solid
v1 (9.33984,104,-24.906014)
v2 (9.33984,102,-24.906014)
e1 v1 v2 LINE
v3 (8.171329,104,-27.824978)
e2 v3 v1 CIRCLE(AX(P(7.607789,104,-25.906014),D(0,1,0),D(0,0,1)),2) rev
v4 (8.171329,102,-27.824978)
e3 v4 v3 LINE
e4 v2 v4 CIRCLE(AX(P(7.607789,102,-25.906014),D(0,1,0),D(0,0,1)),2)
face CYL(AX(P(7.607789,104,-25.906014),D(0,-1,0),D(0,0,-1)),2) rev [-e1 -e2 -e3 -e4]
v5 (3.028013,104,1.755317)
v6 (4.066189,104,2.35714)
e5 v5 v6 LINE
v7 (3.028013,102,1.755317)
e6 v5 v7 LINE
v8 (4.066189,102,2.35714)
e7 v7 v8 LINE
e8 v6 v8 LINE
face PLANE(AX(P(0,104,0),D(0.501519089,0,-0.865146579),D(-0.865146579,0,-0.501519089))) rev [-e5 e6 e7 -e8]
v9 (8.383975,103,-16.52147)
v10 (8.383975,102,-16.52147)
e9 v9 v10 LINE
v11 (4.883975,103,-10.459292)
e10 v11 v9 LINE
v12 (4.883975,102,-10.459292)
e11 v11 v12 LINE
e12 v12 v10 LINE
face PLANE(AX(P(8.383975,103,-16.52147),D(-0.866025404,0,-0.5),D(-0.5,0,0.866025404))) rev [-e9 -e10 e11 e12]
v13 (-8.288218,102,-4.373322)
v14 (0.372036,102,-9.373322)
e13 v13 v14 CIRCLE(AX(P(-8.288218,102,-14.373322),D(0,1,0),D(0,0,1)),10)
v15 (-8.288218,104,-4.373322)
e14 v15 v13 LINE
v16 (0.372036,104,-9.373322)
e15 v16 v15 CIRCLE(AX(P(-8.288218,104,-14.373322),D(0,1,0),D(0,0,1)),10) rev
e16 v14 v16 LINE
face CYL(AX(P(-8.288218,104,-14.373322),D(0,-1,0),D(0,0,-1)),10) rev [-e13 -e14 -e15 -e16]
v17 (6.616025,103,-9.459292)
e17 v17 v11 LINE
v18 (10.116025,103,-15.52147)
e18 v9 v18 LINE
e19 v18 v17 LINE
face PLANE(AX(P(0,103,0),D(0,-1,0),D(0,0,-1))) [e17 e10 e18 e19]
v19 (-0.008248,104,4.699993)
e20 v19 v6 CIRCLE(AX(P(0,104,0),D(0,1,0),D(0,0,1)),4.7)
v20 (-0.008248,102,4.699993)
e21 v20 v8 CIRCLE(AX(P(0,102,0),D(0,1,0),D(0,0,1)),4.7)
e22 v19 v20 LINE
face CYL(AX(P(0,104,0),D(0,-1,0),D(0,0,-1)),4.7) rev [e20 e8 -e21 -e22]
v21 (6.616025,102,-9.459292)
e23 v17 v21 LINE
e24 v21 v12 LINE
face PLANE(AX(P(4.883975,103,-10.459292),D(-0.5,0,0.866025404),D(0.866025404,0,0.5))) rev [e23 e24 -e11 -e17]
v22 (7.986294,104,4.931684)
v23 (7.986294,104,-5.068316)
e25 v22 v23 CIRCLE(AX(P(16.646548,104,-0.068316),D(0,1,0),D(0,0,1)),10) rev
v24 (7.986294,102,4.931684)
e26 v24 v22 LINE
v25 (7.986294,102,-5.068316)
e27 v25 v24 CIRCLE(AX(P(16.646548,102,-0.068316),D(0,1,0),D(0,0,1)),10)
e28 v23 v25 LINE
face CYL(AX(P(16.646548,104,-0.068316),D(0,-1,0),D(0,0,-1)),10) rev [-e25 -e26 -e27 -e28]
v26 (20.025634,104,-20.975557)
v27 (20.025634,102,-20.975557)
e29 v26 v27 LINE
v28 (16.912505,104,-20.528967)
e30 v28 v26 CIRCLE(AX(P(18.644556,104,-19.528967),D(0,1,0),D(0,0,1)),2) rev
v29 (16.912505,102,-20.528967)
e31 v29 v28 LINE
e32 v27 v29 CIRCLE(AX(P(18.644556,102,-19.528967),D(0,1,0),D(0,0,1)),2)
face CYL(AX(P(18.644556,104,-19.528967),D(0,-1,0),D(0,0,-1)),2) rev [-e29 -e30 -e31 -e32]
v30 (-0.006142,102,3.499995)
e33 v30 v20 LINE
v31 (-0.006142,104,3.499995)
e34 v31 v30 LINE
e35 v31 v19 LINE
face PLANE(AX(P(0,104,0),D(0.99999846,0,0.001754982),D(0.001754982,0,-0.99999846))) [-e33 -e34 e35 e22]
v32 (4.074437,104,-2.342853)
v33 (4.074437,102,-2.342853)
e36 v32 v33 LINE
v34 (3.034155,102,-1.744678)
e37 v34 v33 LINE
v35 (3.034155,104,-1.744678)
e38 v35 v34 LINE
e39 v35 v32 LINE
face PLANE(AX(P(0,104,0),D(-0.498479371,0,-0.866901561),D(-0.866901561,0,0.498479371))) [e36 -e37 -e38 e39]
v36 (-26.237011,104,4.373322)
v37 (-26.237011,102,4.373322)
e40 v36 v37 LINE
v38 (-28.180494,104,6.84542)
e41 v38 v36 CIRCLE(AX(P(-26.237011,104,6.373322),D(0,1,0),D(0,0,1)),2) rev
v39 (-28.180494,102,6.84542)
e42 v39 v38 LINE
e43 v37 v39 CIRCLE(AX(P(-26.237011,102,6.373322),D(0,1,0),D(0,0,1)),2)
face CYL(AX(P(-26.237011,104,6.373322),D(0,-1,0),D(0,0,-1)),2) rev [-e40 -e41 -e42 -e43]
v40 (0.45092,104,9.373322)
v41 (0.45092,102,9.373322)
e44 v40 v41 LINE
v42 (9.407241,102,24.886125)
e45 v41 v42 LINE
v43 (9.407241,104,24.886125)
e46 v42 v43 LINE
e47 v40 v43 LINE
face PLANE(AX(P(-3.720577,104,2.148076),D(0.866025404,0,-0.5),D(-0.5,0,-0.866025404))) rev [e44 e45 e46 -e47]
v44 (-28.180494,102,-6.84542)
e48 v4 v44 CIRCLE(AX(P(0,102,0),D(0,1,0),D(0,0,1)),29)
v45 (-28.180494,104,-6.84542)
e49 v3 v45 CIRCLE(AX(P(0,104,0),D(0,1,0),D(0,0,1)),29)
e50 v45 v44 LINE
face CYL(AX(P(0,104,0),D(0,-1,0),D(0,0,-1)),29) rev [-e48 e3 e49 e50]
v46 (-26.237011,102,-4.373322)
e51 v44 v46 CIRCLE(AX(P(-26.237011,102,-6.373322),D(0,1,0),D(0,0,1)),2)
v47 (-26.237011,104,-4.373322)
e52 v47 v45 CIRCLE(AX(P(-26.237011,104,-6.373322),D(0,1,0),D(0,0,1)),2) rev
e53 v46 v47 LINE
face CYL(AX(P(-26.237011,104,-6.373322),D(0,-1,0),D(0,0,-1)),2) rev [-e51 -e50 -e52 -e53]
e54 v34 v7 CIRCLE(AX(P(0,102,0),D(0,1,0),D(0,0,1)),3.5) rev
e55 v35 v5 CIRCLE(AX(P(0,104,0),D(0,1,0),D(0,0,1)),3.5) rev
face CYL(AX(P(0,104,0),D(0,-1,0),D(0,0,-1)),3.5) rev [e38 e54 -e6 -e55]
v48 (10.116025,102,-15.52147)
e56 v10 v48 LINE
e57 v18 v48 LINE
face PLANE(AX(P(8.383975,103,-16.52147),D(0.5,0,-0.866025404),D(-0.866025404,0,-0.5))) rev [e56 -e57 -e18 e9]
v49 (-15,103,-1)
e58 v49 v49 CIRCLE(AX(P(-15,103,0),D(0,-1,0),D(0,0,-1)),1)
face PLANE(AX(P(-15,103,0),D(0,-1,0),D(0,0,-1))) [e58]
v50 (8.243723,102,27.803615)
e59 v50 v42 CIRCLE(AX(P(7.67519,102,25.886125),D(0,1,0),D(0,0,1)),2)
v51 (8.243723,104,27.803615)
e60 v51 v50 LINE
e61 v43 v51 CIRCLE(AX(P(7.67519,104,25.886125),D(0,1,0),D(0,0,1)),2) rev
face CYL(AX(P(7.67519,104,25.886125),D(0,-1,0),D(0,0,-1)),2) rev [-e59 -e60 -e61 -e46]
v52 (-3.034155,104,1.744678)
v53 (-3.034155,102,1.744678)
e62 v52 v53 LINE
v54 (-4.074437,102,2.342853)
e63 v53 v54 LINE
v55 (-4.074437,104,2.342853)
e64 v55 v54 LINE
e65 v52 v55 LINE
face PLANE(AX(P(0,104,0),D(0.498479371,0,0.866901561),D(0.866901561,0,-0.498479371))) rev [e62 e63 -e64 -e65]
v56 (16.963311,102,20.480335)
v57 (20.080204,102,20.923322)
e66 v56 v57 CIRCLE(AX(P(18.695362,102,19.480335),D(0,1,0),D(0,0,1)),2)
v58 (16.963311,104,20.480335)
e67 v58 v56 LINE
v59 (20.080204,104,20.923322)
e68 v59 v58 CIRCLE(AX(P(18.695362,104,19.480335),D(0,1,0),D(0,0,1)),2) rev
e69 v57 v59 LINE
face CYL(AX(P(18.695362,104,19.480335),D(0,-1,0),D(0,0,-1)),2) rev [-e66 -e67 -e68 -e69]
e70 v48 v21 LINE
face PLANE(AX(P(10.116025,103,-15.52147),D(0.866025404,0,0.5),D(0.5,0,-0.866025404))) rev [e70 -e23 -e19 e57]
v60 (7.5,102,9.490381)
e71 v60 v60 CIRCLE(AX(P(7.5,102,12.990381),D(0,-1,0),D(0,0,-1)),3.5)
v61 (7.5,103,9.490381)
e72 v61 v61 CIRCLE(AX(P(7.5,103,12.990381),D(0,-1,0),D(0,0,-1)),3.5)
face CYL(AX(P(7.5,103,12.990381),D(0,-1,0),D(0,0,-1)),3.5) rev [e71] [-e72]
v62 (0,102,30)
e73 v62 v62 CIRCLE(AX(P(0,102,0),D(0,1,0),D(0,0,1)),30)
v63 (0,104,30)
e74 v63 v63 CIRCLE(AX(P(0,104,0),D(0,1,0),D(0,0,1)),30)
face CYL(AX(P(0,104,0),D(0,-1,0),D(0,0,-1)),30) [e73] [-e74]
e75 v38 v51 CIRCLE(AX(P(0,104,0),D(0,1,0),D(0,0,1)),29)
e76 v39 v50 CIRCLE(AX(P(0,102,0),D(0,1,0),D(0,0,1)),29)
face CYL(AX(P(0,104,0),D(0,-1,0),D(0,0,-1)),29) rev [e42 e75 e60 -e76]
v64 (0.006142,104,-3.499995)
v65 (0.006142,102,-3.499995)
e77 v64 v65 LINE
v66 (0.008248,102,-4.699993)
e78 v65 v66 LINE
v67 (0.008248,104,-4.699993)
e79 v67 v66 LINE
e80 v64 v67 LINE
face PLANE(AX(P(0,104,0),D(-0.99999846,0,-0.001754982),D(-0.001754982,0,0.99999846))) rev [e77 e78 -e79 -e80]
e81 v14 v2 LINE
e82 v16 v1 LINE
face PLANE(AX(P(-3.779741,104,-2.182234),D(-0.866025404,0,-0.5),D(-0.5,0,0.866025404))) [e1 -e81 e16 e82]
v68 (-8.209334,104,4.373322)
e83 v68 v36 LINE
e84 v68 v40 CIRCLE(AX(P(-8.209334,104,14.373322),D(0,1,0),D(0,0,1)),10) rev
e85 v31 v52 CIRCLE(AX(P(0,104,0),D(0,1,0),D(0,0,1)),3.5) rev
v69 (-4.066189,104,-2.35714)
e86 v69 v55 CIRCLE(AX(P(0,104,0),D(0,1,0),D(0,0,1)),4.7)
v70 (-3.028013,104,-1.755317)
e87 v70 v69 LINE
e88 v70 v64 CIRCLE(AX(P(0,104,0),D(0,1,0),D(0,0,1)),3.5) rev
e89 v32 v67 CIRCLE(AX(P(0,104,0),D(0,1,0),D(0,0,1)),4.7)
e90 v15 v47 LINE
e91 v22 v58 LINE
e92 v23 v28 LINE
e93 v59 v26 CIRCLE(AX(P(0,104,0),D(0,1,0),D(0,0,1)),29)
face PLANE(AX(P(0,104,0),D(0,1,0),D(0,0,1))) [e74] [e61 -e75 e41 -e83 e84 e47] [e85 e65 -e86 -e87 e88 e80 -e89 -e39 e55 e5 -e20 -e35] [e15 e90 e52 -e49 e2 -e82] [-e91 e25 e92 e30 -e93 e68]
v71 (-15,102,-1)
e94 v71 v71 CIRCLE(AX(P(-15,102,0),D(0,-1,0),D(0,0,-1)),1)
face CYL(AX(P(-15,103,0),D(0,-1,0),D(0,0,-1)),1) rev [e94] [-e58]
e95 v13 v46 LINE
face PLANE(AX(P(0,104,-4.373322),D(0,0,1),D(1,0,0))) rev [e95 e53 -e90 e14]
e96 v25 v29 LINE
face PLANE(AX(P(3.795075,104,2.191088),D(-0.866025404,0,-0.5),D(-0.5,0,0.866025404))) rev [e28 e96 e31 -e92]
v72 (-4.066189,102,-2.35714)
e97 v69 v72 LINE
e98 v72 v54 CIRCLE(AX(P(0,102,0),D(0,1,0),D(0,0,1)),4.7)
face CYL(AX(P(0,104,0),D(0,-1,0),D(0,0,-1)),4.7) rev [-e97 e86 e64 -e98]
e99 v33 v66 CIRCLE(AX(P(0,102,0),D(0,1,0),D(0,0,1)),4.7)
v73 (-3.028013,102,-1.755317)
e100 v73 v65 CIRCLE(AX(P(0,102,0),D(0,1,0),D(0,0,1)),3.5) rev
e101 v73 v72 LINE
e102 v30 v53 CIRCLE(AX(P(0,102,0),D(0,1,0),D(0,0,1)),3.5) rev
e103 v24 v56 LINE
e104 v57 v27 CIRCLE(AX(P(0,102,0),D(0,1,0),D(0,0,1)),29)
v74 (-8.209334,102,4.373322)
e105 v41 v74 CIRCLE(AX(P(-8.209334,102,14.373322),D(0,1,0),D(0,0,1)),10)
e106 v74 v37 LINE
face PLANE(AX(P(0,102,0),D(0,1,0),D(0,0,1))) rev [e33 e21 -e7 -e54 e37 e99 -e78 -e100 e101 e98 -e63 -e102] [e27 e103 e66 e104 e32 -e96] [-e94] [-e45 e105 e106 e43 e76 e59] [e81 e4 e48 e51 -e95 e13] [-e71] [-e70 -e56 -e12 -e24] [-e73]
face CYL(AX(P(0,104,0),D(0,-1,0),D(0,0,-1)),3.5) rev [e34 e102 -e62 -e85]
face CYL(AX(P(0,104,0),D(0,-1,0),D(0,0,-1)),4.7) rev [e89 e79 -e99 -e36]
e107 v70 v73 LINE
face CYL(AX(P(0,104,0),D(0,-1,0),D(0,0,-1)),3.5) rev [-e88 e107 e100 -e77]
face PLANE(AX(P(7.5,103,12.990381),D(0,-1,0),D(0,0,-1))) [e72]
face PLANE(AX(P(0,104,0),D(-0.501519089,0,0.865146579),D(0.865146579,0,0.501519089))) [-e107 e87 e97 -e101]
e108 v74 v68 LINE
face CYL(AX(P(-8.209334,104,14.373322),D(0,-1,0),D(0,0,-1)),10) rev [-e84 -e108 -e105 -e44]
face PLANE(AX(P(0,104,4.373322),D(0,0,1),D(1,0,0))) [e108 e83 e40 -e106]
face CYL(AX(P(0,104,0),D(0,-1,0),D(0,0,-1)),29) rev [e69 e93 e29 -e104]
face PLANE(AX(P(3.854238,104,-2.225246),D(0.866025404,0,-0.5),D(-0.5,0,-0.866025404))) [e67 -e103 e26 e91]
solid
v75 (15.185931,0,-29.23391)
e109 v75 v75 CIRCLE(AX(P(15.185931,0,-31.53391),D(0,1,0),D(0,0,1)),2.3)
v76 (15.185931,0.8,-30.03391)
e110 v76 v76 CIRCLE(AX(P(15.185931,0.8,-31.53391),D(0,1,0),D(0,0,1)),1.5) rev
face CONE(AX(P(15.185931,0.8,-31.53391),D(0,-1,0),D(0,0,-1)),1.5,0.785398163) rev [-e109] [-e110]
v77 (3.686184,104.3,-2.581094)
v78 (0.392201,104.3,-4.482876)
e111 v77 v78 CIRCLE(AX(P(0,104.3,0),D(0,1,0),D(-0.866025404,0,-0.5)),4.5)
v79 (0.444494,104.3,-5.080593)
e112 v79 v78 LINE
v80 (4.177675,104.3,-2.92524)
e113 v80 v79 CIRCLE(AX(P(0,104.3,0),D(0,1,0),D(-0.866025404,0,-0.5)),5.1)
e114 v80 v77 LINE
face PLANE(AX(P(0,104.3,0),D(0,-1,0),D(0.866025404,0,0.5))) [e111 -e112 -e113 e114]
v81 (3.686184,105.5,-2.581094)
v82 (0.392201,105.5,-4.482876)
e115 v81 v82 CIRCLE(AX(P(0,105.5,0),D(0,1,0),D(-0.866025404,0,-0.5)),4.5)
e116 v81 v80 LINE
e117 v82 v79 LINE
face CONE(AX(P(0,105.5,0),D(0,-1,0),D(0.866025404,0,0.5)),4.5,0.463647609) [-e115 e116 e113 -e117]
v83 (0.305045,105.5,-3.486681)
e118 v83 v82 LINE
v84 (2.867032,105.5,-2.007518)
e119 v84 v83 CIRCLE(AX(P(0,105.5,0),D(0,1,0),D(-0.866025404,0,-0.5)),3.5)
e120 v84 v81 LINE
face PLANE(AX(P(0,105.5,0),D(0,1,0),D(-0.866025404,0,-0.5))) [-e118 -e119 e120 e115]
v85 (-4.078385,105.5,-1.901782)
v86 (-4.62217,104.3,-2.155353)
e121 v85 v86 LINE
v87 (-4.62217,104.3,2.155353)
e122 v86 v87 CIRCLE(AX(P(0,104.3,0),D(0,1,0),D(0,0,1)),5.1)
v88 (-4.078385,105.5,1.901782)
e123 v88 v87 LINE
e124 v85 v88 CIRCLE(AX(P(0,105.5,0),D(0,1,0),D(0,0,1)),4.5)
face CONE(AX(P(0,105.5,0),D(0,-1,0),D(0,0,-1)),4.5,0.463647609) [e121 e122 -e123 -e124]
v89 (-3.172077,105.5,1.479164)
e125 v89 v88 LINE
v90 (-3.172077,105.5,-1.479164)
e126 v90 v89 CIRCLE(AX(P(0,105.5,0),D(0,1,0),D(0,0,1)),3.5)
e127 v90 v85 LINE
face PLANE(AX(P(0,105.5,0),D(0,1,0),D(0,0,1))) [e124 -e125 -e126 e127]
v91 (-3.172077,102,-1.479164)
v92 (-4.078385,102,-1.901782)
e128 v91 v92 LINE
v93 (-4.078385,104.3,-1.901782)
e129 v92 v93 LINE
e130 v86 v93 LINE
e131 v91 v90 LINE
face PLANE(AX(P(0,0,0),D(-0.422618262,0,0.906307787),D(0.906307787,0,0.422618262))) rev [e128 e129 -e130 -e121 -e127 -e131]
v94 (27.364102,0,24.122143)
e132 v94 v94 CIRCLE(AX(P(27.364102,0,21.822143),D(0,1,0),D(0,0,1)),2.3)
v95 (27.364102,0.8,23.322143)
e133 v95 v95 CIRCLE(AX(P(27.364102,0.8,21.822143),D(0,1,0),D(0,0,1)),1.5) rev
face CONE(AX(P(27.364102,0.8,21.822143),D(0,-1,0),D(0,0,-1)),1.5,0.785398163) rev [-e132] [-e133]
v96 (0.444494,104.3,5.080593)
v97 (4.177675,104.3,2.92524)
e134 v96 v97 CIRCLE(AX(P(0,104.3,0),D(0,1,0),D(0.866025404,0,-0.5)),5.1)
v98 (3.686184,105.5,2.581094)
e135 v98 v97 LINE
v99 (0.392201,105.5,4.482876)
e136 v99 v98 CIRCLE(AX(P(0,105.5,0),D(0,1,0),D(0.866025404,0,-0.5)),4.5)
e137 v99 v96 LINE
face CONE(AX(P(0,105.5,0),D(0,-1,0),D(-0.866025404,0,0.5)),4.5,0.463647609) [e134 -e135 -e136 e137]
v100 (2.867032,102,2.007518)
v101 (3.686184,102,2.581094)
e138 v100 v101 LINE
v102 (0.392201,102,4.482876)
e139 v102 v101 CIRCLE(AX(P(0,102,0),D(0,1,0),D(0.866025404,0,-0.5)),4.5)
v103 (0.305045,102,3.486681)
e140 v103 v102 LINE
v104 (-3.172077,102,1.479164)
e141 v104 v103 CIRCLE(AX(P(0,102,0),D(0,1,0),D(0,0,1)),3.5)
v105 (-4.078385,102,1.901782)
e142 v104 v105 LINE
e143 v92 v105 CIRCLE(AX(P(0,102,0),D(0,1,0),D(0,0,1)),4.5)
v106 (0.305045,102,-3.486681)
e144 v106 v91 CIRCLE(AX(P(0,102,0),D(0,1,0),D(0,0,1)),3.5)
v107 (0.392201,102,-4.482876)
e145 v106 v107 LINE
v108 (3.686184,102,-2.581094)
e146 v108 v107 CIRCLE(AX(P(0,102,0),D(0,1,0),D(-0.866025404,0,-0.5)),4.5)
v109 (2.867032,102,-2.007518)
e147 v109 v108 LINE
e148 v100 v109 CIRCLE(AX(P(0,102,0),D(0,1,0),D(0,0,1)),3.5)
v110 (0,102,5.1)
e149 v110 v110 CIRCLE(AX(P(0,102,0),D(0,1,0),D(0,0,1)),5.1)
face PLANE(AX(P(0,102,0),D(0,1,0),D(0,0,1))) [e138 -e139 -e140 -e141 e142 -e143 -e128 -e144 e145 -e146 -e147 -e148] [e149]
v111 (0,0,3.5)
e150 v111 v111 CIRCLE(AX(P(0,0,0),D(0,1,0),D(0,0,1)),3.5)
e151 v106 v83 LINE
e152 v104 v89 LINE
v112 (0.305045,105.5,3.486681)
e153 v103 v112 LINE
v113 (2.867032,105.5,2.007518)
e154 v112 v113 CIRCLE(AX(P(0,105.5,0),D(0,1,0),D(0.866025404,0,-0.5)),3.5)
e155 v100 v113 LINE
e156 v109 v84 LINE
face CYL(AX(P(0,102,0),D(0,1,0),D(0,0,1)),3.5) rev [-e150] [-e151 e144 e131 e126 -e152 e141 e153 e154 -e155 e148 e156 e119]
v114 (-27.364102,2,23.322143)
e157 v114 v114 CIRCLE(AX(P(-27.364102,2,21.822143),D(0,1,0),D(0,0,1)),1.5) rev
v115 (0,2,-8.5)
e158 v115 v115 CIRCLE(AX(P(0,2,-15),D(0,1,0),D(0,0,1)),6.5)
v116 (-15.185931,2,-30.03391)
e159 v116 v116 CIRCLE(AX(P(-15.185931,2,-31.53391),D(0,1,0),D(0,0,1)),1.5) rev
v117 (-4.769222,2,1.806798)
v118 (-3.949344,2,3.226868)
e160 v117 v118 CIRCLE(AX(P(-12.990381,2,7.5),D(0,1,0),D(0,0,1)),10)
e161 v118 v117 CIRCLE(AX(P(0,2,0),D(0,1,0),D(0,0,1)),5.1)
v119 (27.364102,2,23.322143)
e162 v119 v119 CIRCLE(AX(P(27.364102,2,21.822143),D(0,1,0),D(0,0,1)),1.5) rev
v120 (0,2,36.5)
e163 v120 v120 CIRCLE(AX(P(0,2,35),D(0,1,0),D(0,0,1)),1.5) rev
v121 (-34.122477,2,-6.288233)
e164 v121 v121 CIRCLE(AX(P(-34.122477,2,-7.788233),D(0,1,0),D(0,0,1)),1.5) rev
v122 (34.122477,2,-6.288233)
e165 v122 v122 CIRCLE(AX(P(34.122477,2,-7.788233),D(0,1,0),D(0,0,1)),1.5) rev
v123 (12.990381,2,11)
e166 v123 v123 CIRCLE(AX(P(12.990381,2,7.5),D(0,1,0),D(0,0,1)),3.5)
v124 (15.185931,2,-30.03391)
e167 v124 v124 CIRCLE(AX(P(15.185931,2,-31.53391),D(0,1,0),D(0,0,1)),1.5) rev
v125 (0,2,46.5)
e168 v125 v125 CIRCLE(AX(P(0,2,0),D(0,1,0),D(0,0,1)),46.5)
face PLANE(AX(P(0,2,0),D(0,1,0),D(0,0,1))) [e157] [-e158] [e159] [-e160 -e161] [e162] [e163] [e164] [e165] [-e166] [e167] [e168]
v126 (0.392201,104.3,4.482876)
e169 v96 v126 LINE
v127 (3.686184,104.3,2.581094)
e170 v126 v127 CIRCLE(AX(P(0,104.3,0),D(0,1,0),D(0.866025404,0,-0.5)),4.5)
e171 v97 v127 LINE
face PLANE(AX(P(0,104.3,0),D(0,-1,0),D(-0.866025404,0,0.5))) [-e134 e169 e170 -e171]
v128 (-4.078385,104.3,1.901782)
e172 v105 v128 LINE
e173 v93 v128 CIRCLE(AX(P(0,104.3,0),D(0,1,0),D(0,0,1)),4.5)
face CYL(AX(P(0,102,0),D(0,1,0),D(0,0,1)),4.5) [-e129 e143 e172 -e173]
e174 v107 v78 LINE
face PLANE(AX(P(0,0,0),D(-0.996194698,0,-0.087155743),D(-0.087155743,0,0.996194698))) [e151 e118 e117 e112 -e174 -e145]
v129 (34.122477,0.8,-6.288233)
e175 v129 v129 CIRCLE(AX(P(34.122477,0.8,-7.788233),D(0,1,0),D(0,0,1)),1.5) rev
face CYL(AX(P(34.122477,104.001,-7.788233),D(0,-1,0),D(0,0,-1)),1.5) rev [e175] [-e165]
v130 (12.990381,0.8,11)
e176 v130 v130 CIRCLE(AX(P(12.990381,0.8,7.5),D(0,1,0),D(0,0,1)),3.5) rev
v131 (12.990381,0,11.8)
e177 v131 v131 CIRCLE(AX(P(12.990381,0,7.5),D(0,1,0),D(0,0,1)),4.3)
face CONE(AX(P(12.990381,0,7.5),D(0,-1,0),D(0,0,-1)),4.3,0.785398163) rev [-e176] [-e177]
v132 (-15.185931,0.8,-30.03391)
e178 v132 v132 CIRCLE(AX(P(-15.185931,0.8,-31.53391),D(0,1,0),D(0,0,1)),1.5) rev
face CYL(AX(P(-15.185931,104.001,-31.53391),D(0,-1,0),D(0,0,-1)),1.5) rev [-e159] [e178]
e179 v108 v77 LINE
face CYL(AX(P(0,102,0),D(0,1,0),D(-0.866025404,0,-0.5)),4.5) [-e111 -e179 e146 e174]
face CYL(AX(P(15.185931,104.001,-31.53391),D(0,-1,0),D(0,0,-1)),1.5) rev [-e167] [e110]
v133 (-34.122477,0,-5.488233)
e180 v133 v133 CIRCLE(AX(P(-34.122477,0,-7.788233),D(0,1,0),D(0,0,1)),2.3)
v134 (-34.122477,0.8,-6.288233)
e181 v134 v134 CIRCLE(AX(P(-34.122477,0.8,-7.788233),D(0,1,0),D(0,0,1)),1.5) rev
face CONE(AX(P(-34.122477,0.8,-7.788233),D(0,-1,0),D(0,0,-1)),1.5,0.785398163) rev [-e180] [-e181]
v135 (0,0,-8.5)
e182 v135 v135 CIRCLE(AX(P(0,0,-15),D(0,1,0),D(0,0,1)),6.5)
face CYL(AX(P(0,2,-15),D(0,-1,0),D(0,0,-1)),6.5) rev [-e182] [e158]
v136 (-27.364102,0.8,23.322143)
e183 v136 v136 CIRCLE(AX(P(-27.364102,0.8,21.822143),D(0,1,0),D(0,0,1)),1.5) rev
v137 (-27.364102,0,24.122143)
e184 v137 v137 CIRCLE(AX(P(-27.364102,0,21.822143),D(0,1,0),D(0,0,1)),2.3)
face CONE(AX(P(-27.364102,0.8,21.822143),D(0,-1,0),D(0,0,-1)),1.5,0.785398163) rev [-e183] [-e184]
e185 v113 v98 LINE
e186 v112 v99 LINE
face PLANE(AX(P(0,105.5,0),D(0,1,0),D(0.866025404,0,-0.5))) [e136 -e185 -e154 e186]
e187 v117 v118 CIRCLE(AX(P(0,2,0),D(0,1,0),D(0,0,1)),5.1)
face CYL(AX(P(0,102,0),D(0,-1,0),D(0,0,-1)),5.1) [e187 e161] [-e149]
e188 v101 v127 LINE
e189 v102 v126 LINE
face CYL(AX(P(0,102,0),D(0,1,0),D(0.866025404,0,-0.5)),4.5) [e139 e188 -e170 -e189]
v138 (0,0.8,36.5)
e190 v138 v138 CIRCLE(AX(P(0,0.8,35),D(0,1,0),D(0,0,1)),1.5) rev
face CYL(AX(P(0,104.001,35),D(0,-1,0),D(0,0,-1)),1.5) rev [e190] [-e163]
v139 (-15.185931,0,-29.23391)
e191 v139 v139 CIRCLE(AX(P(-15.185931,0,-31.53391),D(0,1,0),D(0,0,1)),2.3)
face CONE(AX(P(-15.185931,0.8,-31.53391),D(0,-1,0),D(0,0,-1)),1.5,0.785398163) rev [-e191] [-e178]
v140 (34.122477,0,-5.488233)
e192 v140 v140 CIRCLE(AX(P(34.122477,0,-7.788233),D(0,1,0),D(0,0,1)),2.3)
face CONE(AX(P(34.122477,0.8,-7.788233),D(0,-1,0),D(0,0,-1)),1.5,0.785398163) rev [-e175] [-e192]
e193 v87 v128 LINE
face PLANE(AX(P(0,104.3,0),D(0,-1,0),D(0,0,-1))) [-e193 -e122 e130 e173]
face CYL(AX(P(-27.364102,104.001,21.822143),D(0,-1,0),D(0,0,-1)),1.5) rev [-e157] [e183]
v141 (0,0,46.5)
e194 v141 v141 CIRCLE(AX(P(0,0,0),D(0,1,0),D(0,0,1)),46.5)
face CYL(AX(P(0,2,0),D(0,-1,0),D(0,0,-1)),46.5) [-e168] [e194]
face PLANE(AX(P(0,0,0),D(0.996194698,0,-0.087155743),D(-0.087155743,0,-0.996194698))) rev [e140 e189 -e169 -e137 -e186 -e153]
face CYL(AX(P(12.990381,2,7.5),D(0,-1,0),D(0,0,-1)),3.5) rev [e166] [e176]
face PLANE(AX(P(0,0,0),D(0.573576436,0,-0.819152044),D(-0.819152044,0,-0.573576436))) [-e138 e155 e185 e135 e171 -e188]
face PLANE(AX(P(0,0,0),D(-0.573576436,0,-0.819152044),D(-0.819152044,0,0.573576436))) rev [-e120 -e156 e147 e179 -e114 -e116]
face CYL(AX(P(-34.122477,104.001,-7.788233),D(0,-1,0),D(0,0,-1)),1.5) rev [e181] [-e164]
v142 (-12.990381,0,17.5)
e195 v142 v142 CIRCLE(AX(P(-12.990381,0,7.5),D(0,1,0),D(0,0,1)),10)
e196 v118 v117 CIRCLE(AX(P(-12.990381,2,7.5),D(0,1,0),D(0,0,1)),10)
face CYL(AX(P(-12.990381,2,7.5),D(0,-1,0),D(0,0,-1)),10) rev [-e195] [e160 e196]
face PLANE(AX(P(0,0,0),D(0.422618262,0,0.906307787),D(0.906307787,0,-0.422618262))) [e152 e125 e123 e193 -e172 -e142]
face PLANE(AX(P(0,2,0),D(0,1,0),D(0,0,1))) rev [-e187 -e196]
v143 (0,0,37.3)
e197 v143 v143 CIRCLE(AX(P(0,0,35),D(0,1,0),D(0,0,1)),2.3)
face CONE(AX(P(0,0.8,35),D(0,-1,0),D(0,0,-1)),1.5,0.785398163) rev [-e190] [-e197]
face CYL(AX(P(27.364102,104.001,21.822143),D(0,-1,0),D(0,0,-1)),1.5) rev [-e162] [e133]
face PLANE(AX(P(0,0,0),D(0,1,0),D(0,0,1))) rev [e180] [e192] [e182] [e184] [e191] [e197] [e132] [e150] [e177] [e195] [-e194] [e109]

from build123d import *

# Parameters (mm, degrees)
SKETCH1_R           = 46.5
SKETCH1_R_2         = 6.5
SKETCH1_R_3         = 10
SKETCH1_R_4         = 3.5
BOSS_EXTRUDE1_DEPTH = 2
SKETCH3_R           = 5.1
SKETCH3_R_2         = 3.5
BOSS_EXTRUDE2_DEPTH = 100
SKETCH4_R           = 30
SKETCH4_R_2         = 29
BOSS_EXTRUDE5_DEPTH = 2
FILLET1_R           = 10
FILLET2_R           = 2
SKETCH5_R           = 1
SKETCH5_R_2         = 3.5
CUT_EXTRUDE1_DEPTH  = 1
SKETCH6_R           = 1.5
CUT_EXTRUDE2_DEPTH  = 2
CHAMFER2_SIZE       = 0.8
REVOLVE1_ANGLE      = 50
CIRPATTERN1_COUNT   = 3


# Read off the part's stored shape, not the designer's step: Revolve1
with BuildPart() as part:
    # Sketch1 → Boss-Extrude1 (new body)
    with BuildSketch(Plane(origin=(0, 0, 0), x_dir=(1, 0, 0), z_dir=(0, 1, 0))):
        with Locations(Location((0, 0, 0), (0, 0, 270))):
            Circle(SKETCH1_R)
        with Locations(Location((0, 15, 0), (0, 0, 270))):
            Circle(SKETCH1_R_2, mode=Mode.SUBTRACT)
        with Locations(Location((-12.990381057, -7.5, 0), (0, 0, 270))):
            Circle(SKETCH1_R_3, mode=Mode.SUBTRACT)
        with Locations(Location((12.990381057, -7.5, 0), (0, 0, 270))):
            Circle(SKETCH1_R_4, mode=Mode.SUBTRACT)
        with Locations(Location((0, 0, 0), (0, 0, 270))):
            Circle(SKETCH1_R_4, mode=Mode.SUBTRACT)
    extrude(amount=BOSS_EXTRUDE1_DEPTH)

    # Sketch3 → Boss-Extrude2 (add)
    with BuildSketch(Plane(origin=(0, 2, 0), x_dir=(1, 0, 0), z_dir=(0, 1, 0))):
        with Locations(Location((0, 0, 0), (0, 0, 200.748965475))):
            Circle(SKETCH3_R)
        with Locations(Location((0, 0, 0), (0, 0, 270))):
            Circle(SKETCH3_R_2, mode=Mode.SUBTRACT)
    extrude(amount=BOSS_EXTRUDE2_DEPTH)

    # Sketch6 → Cut-Extrude2 (cut)
    with BuildSketch(Plane.XZ):
        with Locations(Location((0, 35, 0), (0, 0, 270))):
            Circle(SKETCH6_R)
        with Locations(Location((27.364101886, 21.822143065, 0), (0, 0, 270))):
            Circle(SKETCH6_R)
        with Locations(Location((34.122476926, -7.788232688, 0), (0, 0, 270))):
            Circle(SKETCH6_R)
        with Locations(Location((15.185930869, -31.533910377, 0), (0, 0, 270))):
            Circle(SKETCH6_R)
        with Locations(Location((-15.185930869, -31.533910377, 0), (0, 0, 270))):
            Circle(SKETCH6_R)
        with Locations(Location((-34.122476926, -7.788232688, 0), (0, 0, 270))):
            Circle(SKETCH6_R)
        with Locations(Location((-27.364101886, 21.822143065, 0), (0, 0, 270))):
            Circle(SKETCH6_R)
    extrude(amount=-CUT_EXTRUDE2_DEPTH, mode=Mode.SUBTRACT)

    # Chamfer2
    chamfer2_edges = [part.edges().sort_by_distance(p)[0] for p in [
        (12.990381057, 0, 4),
        (34.122476926, 0, -6.288232688),
        (27.364101886, 0, 23.322143065),
        (0, 0, 36.5),
        (-27.364101886, 0, 23.322143065),
        (-34.122476926, 0, -6.288232688),
        (-15.185930869, 0, -30.033910377),
        (15.185930869, 0, -30.033910377),
    ]]
    chamfer(chamfer2_edges, length=CHAMFER2_SIZE)


with BuildPart() as body_2:
    # Sketch4 → Boss-Extrude5 (new body)
    # profile 1 of 13: a face of its own
    with BuildSketch(Plane(origin=(0, 102, 0), x_dir=(1, 0, 0), z_dir=(0, 1, 0))):
        with Locations(Location((0, 0, 0), (0, 0, 270))):
            Circle(SKETCH4_R)
        Circle(SKETCH4_R_2, mode=Mode.SUBTRACT)
    # profile 2 of 13: a face of its own
    with BuildSketch(Plane(origin=(0, 102, 0), x_dir=(1, 0, 0), z_dir=(0, 1, 0))):
        with BuildLine():
            Line((10.555107028, 27.010918452), (-2.460515776, 4.467198464))
            ThreePointArc((-2.460515776, 4.467198464), (-1.265958194, 4.940379525), (0.008950407, 5.099992146))
            ThreePointArc((0.008950407, 5.099992146), (2.557747353, 4.412247554), (4.421197961, 2.542244793))
            ThreePointArc((4.421197961, 2.542244793), (4.918455601, 1.348626894), (5.099542425, 0.068315834))
            Line((5.099542425, 0.068315834), (18.128572143, 22.635257278))
            ThreePointArc((18.128572143, 22.635257278), (14.507755353, 25.110257558), (10.555107028, 27.010918452))
        make_face()
    # profile 3 of 13: a face of its own
    with BuildSketch(Plane(origin=(0, 102, 0), x_dir=(1, 0, 0), z_dir=(0, 1, 0))):
        with BuildLine():
            ThreePointArc((-4.412247554, 2.557747353), (-3.633233752, 3.5790519), (-2.623748403, 4.373321886))
            Line((-2.623748403, 4.373321886), (-28.668345883, 4.373321886))
            ThreePointArc((-28.668345883, 4.373321886), (-29, 0), (-28.668345883, -4.373321886))
            Line((-28.668345883, -4.373321886), (-2.623748403, -4.373321886))
            ThreePointArc((-2.623748403, -4.373321886), (-3.639509328, -3.572670129), (-4.421197961, -2.542244793))
            ThreePointArc((-4.421197961, -2.542244793), (-5.099992146, 0.008950407), (-4.412247554, 2.557747353))
        make_face()
    # profile 4 of 13: a face of its own
    with BuildSketch(Plane(origin=(0, 102, 0), x_dir=(1, 0, 0), z_dir=(0, 1, 0))):
        with BuildLine():
            Line((-2.346434517, -4.528161333), (10.619428606, -26.985695027))
            ThreePointArc((10.619428606, -26.985695027), (14.567551204, -25.075614687), (18.182472179, -22.591983212))
            Line((18.182472179, -22.591983212), (5.099542425, 0.068315834))
            ThreePointArc((5.099542425, 0.068315834), (5.099885605, 0.034158683), (5.1, 0))
            ThreePointArc((5.1, 0), (4.925061549, -1.324299338), (4.412247554, -2.557747353))
            ThreePointArc((4.412247554, -2.557747353), (2.542244793, -4.421197961), (-0.008950407, -5.099992146))
            ThreePointArc((-0.008950407, -5.099992146), (-1.211902288, -4.953916919), (-2.346434517, -4.528161333))
        make_face()
    # profile 5 of 13: a face of its own
    with BuildSketch(Plane(origin=(0, 102, 0), x_dir=(1, 0, 0), z_dir=(0, 1, 0))):
        with BuildLine():
            Line((-2.460515776, 4.467198464), (-2.514715444, 4.373321886))
            Line((-2.514715444, 4.373321886), (-2.623748403, 4.373321886))
            ThreePointArc((-2.623748403, 4.373321886), (-3.633233752, 3.5790519), (-4.412247554, 2.557747353))
            Line((-4.412247554, 2.557747353), (-4.066188922, 2.357139718))
            ThreePointArc((-4.066188922, 2.357139718), (-2.342853045, 4.074437337), (0.008248414, 4.699992762))
            Line((0.008248414, 4.699992762), (0.008950407, 5.099992146))
            ThreePointArc((0.008950407, 5.099992146), (-1.265958194, 4.940379525), (-2.460515776, 4.467198464))
        make_face()
    # profile 6 of 13: a face of its own
    with BuildSketch(Plane(origin=(0, 102, 0), x_dir=(1, 0, 0), z_dir=(0, 1, 0))):
        with BuildLine():
            ThreePointArc((0.008248414, 4.699992762), (-2.342853045, 4.074437337), (-4.066188922, 2.357139718))
            Line((-4.066188922, 2.357139718), (-3.028013027, 1.755316811))
            ThreePointArc((-3.028013027, 1.755316811), (-1.744677799, 3.034155464), (0.006142436, 3.49999461))
            Line((0.006142436, 3.49999461), (0.008248414, 4.699992762))
        make_face()
    # profile 7 of 13: a face of its own
    with BuildSketch(Plane(origin=(0, 102, 0), x_dir=(1, 0, 0), z_dir=(0, 1, 0))):
        with BuildLine():
            ThreePointArc((4.7, 0), (4.54091706, 1.212465364), (4.074437337, 2.342853045))
            Line((4.074437337, 2.342853045), (3.034155464, 1.744677799))
            ThreePointArc((3.034155464, 1.744677799), (3.38153398, 0.902899739), (3.5, 0))
            ThreePointArc((3.5, 0), (3.3799442, -0.908832879), (3.028013027, -1.755316811))
            Line((3.028013027, -1.755316811), (4.066188922, -2.357139718))
            ThreePointArc((4.066188922, -2.357139718), (4.538782212, -1.220432723), (4.7, 0))
        make_face()
    # profile 8 of 13: a face of its own
    with BuildSketch(Plane(origin=(0, 102, 0), x_dir=(1, 0, 0), z_dir=(0, 1, 0))):
        with BuildLine():
            ThreePointArc((5.099542425, 0.068315834), (4.918455601, 1.348626894), (4.421197961, 2.542244793))
            Line((4.421197961, 2.542244793), (4.074437337, 2.342853045))
            ThreePointArc((4.074437337, 2.342853045), (4.54091706, 1.212465364), (4.7, 0))
            ThreePointArc((4.7, 0), (4.538782212, -1.220432723), (4.066188922, -2.357139718))
            Line((4.066188922, -2.357139718), (4.412247554, -2.557747353))
            ThreePointArc((4.412247554, -2.557747353), (4.925061549, -1.324299338), (5.1, 0))
            ThreePointArc((5.1, 0), (5.099885605, 0.034158683), (5.099542425, 0.068315834))
        make_face()
    # profile 9 of 13: a face of its own
    with BuildSketch(Plane(origin=(0, 102, 0), x_dir=(1, 0, 0), z_dir=(0, 1, 0))):
        with BuildLine():
            ThreePointArc((4.421197961, 2.542244793), (2.557747353, 4.412247554), (0.008950407, 5.099992146))
            Line((0.008950407, 5.099992146), (0.008248414, 4.699992762))
            ThreePointArc((0.008248414, 4.699992762), (2.357139718, 4.066188922), (4.074437337, 2.342853045))
            Line((4.074437337, 2.342853045), (4.421197961, 2.542244793))
        make_face()
    # profile 10 of 13: a face of its own
    with BuildSketch(Plane(origin=(0, 102, 0), x_dir=(1, 0, 0), z_dir=(0, 1, 0))):
        with BuildLine():
            ThreePointArc((4.066188922, -2.357139718), (2.342853045, -4.074437337), (-0.008248414, -4.699992762))
            Line((-0.008248414, -4.699992762), (-0.008950407, -5.099992146))
            ThreePointArc((-0.008950407, -5.099992146), (2.542244793, -4.421197961), (4.412247554, -2.557747353))
            Line((4.412247554, -2.557747353), (4.066188922, -2.357139718))
        make_face()
    # profile 11 of 13: a face of its own
    with BuildSketch(Plane(origin=(0, 102, 0), x_dir=(1, 0, 0), z_dir=(0, 1, 0))):
        with BuildLine():
            Line((-4.074437337, -2.342853045), (-4.421197961, -2.542244793))
            ThreePointArc((-4.421197961, -2.542244793), (-3.639509328, -3.572670129), (-2.623748403, -4.373321886))
            Line((-2.623748403, -4.373321886), (-2.435831114, -4.373321886))
            Line((-2.435831114, -4.373321886), (-2.346434517, -4.528161333))
            ThreePointArc((-2.346434517, -4.528161333), (-1.211902288, -4.953916919), (-0.008950407, -5.099992146))
            Line((-0.008950407, -5.099992146), (-0.008248414, -4.699992762))
            ThreePointArc((-0.008248414, -4.699992762), (-2.357139718, -4.066188922), (-4.074437337, -2.342853045))
        make_face()
    # profile 12 of 13: a face of its own
    with BuildSketch(Plane(origin=(0, 102, 0), x_dir=(1, 0, 0), z_dir=(0, 1, 0))):
        with BuildLine():
            Line((-3.034155464, -1.744677799), (-4.074437337, -2.342853045))
            ThreePointArc((-4.074437337, -2.342853045), (-2.357139718, -4.066188922), (-0.008248414, -4.699992762))
            Line((-0.008248414, -4.699992762), (-0.006142436, -3.49999461))
            ThreePointArc((-0.006142436, -3.49999461), (-1.755316811, -3.028013027), (-3.034155464, -1.744677799))
        make_face()
    # profile 13 of 13: a face of its own
    with BuildSketch(Plane(origin=(0, 102, 0), x_dir=(1, 0, 0), z_dir=(0, 1, 0))):
        with BuildLine():
            Line((-4.066188922, 2.357139718), (-4.412247554, 2.557747353))
            ThreePointArc((-4.412247554, 2.557747353), (-5.099992146, 0.008950407), (-4.421197961, -2.542244793))
            Line((-4.421197961, -2.542244793), (-4.074437337, -2.342853045))
            ThreePointArc((-4.074437337, -2.342853045), (-4.699992762, 0.008248414), (-4.066188922, 2.357139718))
        make_face()
    extrude(amount=BOSS_EXTRUDE5_DEPTH)

    # Fillet1
    fillet1_edges = [body_2.edges().sort_by_distance(p)[0] for p in [
        (5.099542425, 103, -0.068315834),
        (-2.435831114, 103, 4.373321886),
        (-2.514715444, 103, -4.373321886),
    ]]
    fillet(fillet1_edges, radius=FILLET1_R)

    # Fillet2
    fillet2_edges = [body_2.edges().sort_by_distance(p)[0] for p in [
        (18.182472179, 103, 22.591983212),
        (18.128572143, 103, -22.635257278),
        (10.619428606, 103, 26.985695027),
        (-28.668345883, 103, 4.373321886),
        (10.555107028, 103, -27.010918452),
        (-28.668345883, 103, -4.373321886),
    ]]
    fillet(fillet2_edges, radius=FILLET2_R)

    # Sketch5 → Cut-Extrude1 (cut)
    with BuildSketch(Plane.XZ.offset(-102)):
        with Locations(Location((-15, 0, 0), (0, 0, 270))):
            Circle(SKETCH5_R)
        with Locations(Location((7.5, 12.990381057, 0), (0, 0, 270))):
            Circle(SKETCH5_R_2)
        Polygon((8.383974596, -16.52146997), (4.883974596, -10.459292144), (6.616025404, -9.459292144), (10.116025404, -15.52146997), align=None)
    extrude(amount=-CUT_EXTRUDE1_DEPTH, mode=Mode.SUBTRACT)


with BuildPart() as body_3:
    # Revolve1 outline → Revolve1 (revolve)
    with BuildSketch(Plane(origin=(0, 0, 0), x_dir=(-0.9063077870366494, 0, -0.4226182617407007), z_dir=(0.4226182617407007, 0, -0.9063077870366494))):
        Polygon((3.5, 105.5), (3.5, 102), (4.5, 102), (4.5, 104.3), (5.1, 104.3), (4.5, 105.5), align=None)
    revolve1 = revolve(axis=Axis((0, 0, 0), (0, 1, 0)), revolution_arc=REVOLVE1_ANGLE)


with BuildPart() as part_1:
    add(part.part)

    # CirPattern1: Revolve1 ×3 about axis
    cirpattern1_axis = Axis((0, 102, 0), (0, -1, 0))
    for i in range(1, CIRPATTERN1_COUNT):
        add(revolve1.rotate(cirpattern1_axis, i * 360 / CIRPATTERN1_COUNT))


with BuildPart() as body_3_1:
    add(body_3.part)

    # Combine2: union part
    add(part_1.part)


solid = Compound([body_2.part, body_3_1.part])
